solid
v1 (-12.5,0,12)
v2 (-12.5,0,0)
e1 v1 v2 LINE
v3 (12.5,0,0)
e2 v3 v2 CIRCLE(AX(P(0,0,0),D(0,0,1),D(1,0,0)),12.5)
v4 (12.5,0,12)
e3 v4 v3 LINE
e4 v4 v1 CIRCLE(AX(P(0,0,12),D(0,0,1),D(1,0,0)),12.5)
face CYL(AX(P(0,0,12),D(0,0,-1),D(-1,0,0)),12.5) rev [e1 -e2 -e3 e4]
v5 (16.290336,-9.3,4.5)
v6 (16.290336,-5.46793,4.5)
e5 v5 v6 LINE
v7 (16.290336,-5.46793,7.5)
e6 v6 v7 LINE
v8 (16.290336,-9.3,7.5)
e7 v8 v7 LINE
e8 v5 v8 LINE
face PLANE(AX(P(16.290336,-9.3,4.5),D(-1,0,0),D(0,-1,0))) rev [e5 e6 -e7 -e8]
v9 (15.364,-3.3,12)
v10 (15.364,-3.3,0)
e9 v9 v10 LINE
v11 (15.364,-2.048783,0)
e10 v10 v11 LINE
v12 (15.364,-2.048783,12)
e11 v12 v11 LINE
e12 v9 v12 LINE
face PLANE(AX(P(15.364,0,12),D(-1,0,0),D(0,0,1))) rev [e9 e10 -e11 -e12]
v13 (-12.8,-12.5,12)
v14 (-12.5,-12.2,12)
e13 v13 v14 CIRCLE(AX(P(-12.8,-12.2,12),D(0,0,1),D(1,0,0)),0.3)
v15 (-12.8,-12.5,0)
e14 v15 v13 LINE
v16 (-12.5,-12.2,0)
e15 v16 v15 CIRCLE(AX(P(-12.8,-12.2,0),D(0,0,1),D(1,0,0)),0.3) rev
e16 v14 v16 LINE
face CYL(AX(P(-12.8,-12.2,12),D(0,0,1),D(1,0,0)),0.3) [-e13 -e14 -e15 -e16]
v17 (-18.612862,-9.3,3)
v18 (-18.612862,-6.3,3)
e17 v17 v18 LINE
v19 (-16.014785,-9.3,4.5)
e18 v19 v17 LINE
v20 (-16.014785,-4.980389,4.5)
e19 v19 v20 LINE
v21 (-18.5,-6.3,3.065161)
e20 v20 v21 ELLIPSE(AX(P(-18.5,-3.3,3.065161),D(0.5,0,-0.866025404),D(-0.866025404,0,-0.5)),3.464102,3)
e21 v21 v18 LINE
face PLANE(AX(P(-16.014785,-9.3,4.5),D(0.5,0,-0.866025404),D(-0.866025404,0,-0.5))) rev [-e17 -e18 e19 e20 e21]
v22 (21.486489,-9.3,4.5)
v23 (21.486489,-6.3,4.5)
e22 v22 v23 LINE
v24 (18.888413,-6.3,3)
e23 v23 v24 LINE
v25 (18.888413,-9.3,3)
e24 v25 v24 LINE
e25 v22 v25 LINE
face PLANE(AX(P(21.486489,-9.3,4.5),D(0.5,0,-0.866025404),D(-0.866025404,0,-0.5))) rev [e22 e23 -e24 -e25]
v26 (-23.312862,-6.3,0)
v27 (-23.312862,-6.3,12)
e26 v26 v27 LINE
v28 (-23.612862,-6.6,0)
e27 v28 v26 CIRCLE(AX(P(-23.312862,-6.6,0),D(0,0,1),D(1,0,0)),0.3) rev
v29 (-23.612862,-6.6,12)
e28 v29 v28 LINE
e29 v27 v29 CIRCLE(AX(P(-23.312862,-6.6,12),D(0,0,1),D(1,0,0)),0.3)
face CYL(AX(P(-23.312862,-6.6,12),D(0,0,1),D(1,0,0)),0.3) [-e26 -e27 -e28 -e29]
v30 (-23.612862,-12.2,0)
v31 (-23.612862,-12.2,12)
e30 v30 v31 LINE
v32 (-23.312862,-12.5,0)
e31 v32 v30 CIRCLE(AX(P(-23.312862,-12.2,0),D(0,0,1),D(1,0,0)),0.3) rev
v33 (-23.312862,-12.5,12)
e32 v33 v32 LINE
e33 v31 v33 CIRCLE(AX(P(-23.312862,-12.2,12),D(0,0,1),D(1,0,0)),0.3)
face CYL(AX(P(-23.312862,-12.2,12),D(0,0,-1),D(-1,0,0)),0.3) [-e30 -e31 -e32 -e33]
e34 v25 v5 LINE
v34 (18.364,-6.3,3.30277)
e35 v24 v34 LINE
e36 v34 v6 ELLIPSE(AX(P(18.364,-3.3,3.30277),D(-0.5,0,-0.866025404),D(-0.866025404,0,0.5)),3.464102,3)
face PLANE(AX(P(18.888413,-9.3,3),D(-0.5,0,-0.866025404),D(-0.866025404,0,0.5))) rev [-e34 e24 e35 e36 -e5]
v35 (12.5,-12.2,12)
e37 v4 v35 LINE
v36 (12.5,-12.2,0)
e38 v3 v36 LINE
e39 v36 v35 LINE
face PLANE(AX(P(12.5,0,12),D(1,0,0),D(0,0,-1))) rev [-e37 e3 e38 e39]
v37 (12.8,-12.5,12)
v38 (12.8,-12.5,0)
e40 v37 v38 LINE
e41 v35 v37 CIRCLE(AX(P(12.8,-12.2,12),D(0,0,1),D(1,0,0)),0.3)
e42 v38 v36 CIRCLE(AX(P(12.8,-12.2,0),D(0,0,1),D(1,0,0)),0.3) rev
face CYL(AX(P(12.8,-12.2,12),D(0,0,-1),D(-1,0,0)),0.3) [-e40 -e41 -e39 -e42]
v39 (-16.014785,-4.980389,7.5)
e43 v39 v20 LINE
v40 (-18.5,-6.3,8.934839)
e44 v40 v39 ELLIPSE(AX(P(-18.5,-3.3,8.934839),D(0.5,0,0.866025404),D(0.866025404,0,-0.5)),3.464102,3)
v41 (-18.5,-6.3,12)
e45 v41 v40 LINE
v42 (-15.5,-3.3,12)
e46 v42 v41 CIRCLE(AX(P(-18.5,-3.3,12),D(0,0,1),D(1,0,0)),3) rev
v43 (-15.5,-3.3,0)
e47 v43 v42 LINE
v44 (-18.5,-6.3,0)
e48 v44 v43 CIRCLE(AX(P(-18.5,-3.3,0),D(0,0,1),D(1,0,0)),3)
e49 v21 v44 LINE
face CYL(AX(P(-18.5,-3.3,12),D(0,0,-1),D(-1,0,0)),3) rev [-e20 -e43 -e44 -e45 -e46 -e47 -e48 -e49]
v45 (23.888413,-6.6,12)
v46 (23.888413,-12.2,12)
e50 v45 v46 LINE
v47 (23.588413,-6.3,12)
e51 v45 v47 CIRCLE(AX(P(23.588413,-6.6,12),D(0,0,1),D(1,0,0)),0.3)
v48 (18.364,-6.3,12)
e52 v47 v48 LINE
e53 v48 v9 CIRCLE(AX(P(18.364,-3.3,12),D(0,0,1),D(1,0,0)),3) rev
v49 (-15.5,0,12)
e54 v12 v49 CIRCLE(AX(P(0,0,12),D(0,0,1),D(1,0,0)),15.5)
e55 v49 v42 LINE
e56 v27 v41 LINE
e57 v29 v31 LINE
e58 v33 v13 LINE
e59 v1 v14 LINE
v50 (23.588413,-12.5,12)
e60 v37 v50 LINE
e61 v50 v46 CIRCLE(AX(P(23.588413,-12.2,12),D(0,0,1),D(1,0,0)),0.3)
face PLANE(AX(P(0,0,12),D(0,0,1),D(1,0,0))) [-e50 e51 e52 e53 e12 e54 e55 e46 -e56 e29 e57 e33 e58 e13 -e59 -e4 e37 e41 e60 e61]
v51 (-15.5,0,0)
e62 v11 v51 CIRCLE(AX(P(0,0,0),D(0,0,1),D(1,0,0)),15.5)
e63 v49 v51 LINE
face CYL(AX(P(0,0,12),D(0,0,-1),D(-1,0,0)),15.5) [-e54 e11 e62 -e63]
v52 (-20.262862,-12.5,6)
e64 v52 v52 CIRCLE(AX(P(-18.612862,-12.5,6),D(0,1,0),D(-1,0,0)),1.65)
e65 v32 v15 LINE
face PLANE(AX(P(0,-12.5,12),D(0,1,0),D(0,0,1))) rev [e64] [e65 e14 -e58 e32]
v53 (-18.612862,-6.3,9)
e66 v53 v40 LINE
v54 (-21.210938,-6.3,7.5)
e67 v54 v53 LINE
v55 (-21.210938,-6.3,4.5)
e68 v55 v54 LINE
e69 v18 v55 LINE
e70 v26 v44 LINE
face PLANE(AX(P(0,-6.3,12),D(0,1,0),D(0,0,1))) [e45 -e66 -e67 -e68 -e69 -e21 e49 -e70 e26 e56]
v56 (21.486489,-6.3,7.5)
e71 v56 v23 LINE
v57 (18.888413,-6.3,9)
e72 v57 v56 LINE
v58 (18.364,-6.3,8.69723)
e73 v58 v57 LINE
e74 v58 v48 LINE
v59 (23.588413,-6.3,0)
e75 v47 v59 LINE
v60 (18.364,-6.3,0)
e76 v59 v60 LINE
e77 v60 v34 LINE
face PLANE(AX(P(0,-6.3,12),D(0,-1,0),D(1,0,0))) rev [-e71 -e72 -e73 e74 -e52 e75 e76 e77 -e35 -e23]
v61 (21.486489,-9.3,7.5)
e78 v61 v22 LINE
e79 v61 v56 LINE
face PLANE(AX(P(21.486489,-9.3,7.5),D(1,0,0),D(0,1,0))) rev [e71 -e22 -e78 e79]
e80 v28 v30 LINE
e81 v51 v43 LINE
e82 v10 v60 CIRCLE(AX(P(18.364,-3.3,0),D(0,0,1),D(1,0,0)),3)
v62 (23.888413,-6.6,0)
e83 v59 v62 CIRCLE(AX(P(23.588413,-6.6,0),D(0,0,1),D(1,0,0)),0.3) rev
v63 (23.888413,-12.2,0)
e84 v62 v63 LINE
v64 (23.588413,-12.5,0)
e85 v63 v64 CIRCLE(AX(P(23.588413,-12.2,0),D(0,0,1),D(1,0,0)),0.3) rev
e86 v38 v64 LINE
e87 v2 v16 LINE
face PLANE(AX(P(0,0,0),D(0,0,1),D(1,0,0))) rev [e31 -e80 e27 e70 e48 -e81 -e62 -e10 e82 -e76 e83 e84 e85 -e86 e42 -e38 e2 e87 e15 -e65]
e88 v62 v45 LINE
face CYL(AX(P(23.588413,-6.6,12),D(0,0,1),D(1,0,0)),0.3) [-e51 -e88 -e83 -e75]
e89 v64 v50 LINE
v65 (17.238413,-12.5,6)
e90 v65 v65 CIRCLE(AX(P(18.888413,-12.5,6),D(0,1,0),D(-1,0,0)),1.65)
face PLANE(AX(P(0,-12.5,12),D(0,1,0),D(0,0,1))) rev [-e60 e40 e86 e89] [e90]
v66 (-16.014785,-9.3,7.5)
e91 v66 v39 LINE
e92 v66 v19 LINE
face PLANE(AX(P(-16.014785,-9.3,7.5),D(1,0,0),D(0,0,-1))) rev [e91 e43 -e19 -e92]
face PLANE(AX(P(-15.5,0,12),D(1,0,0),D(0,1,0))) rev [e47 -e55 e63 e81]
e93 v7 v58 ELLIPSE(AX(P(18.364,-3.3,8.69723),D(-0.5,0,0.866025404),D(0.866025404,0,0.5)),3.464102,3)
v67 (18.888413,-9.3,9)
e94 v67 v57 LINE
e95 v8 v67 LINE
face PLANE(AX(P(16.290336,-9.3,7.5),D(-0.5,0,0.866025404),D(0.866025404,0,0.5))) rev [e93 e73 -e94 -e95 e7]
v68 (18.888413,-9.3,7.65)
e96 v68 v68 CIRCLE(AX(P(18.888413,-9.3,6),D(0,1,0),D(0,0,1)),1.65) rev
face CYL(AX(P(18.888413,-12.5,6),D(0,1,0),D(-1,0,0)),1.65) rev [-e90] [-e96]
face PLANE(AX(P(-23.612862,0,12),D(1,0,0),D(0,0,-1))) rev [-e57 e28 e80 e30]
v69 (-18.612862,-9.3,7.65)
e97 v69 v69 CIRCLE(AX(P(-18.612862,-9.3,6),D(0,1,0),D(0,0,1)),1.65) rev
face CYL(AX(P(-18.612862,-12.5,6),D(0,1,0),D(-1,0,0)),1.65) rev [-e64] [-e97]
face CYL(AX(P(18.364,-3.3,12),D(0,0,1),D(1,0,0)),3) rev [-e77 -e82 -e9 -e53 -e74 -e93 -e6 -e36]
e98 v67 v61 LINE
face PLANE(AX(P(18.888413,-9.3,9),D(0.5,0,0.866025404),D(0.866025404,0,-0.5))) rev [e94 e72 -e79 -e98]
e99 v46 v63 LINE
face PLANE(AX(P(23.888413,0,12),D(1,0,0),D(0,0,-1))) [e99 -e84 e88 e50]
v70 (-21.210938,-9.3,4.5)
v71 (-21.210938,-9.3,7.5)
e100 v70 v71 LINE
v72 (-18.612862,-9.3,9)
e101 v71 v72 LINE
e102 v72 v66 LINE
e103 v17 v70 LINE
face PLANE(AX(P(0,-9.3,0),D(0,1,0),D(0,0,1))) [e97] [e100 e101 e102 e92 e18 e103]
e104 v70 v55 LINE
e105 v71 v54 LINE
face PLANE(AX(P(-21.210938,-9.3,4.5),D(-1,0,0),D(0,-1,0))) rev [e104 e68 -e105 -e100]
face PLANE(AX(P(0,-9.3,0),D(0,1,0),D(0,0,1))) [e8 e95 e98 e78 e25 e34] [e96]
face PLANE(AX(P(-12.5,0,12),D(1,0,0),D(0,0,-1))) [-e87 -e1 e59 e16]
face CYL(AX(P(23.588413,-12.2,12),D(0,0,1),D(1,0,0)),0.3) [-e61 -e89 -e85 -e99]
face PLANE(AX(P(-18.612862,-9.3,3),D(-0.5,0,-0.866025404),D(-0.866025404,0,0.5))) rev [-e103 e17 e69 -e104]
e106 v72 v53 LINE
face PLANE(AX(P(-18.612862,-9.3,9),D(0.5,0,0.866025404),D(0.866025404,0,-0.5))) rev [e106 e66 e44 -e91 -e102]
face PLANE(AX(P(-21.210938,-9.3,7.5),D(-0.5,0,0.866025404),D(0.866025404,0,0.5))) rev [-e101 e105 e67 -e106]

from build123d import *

# Parameters (mm, degrees)
BOSS_EXTRUDE1_DEPTH = 12
SKETCH2_R           = 1.65
CUT_EXTRUDE1_DEPTH  = 35.49487292
CUT_EXTRUDE2_DEPTH  = 3
FILLET2_R           = 3
FILLET3_R           = 0.3


with BuildPart() as part:
    # Sketch1 → Boss-Extrude1 (new body)
    with BuildSketch(Plane.XY):
        with BuildLine():
            Line((-12.5, -12.5), (-12.5, 0))
            ThreePointArc((-12.5, 0), (0, 12.5), (12.5, 0))
            Line((12.5, 0), (12.5, -12.5))
            Line((12.5, -12.5), (23.888412626, -12.5))
            Line((23.888412626, -12.5), (23.888412626, -6.3))
            Line((23.888412626, -6.3), (15.363999686, -6.3))
            Line((15.363999686, -6.3), (15.363999686, -2.048783456))
            ThreePointArc((15.363999686, -2.048783456), (1.026646207, 15.465962549), (-15.5, 0))
            Line((-15.5, 0), (-15.5, -6.3))
            Line((-15.5, -6.3), (-23.612861565, -6.3))
            Line((-23.612861565, -6.3), (-23.612861565, -12.5))
            Line((-23.612861565, -12.5), (-12.5, -12.5))
        make_face()
    extrude(amount=BOSS_EXTRUDE1_DEPTH)

    # Sketch2 → Cut-Extrude1 (cut, through all)
    with BuildSketch(Plane(origin=(0, -6.3, 0), x_dir=(1, 0, 0), z_dir=(0, 1, 0))):
        with Locations(Location((-18.612861565, -6, 0), (0, 0, 180))):
            Circle(SKETCH2_R)
        with Locations(Location((18.888412626, -6, 0), (0, 0, 180))):
            Circle(SKETCH2_R)
    extrude(amount=-CUT_EXTRUDE1_DEPTH, mode=Mode.SUBTRACT)

    # Sketch3 → Cut-Extrude2 (cut)
    with BuildSketch(Plane(origin=(0, -6.3, 0), x_dir=(1, 0, 0), z_dir=(0, 1, 0))):
        Polygon((18.888412626, -3), (16.290336415, -4.5), (16.290336415, -7.5), (18.888412626, -9), (21.486488837, -7.5), (21.486488837, -4.5), align=None)
        Polygon((-18.612861565, -9), (-16.014785354, -7.5), (-16.014785354, -4.5), (-18.612861565, -3), (-21.210937777, -4.5), (-21.210937777, -7.5), align=None)
    extrude(amount=-CUT_EXTRUDE2_DEPTH, mode=Mode.SUBTRACT)

    # Fillet2
    # the kernel refuses this fillet: 3 mm, written as the material it adds along each edge
    with BuildSketch(Plane(origin=(-15.5, -6.3, 0), x_dir=(0, 1, 0), z_dir=(0, 0, 1))) as fillet2_piece_1_section:
        with BuildLine():
            CenterArc((FILLET2_R, FILLET2_R), FILLET2_R, 180, 90)
            Line((0, FILLET2_R), (0, 0))
            Line((0, 0), (FILLET2_R, 0))
        make_face()
    fillet2_piece_1 = extrude(amount=12, mode=Mode.PRIVATE)
    fillet2_piece_1 = split(fillet2_piece_1, bisect_by=Plane(origin=(-16.699597169, -5.271939642, 4.104623714), z_dir=(0.5000000000000008, 0, -0.8660254037844383)), keep=Keep.TOP, mode=Mode.PRIVATE)
    fillet2_piece_1 = split(fillet2_piece_1, bisect_by=Plane(origin=(-16.014785354, -5.271939642, 2.345499265), z_dir=(1, 0, 0)), keep=Keep.TOP, mode=Mode.PRIVATE)
    add(fillet2_piece_1)
    with BuildSketch(Plane(origin=(-15.5, -6.3, 0), x_dir=(0, 1, 0), z_dir=(0, 0, 1))) as fillet2_piece_2_section:
        with BuildLine():
            CenterArc((FILLET2_R, FILLET2_R), FILLET2_R, 180, 90)
            Line((0, FILLET2_R), (0, 0))
            Line((0, 0), (FILLET2_R, 0))
        make_face()
    fillet2_piece_2 = extrude(amount=12, mode=Mode.PRIVATE)
    fillet2_piece_2 = split(fillet2_piece_2, bisect_by=Plane(origin=(-17.543441621, -5.964994309, 3.617429893), z_dir=(0.5000000000000008, 0, -0.8660254037844383)), keep=Keep.TOP, mode=Mode.PRIVATE)
    fillet2_piece_2 = split(fillet2_piece_2, bisect_by=Plane(origin=(-16.014785354, -5.964994309, 2.067102796), z_dir=(-1, 0, 0)), keep=Keep.TOP, mode=Mode.PRIVATE)
    add(fillet2_piece_2)
    with BuildSketch(Plane(origin=(-15.5, -6.3, 0), x_dir=(0, 1, 0), z_dir=(0, 0, 1))) as fillet2_piece_3_section:
        with BuildLine():
            CenterArc((FILLET2_R, FILLET2_R), FILLET2_R, 180, 90)
            Line((0, FILLET2_R), (0, 0))
            Line((0, 0), (FILLET2_R, 0))
        make_face()
    fillet2_piece_3 = extrude(amount=12, mode=Mode.PRIVATE)
    fillet2_piece_3 = split(fillet2_piece_3, bisect_by=Plane(origin=(-15.128726527, -5.296162819, 5.011566302), z_dir=(-0.5000000000000008, 0, 0.8660254037844383)), keep=Keep.TOP, mode=Mode.PRIVATE)
    fillet2_piece_3 = split(fillet2_piece_3, bisect_by=Plane(origin=(-16.014785354, -5.296162819, 6), z_dir=(1, 0, 0)), keep=Keep.TOP, mode=Mode.PRIVATE)
    fillet2_piece_3 = split(fillet2_piece_3, bisect_by=Plane(origin=(-15.128726527, -5.296162819, 6.988433698), z_dir=(-0.49999999999999994, 0, -0.8660254037844389)), keep=Keep.TOP, mode=Mode.PRIVATE)
    add(fillet2_piece_3)
    with BuildSketch(Plane(origin=(-15.5, -6.3, 0), x_dir=(0, 1, 0), z_dir=(0, 0, 1))) as fillet2_piece_4_section:
        with BuildLine():
            CenterArc((FILLET2_R, FILLET2_R), FILLET2_R, 180, 90)
            Line((0, FILLET2_R), (0, 0))
            Line((0, 0), (FILLET2_R, 0))
        make_face()
    fillet2_piece_4 = extrude(amount=12, mode=Mode.PRIVATE)
    fillet2_piece_4 = split(fillet2_piece_4, bisect_by=Plane(origin=(-16.014785354, -5.271939642, 9.654500735), z_dir=(1, 0, 0)), keep=Keep.TOP, mode=Mode.PRIVATE)
    fillet2_piece_4 = split(fillet2_piece_4, bisect_by=Plane(origin=(-16.699597169, -5.271939642, 7.895376286), z_dir=(0.49999999999999994, 0, 0.8660254037844389)), keep=Keep.TOP, mode=Mode.PRIVATE)
    add(fillet2_piece_4)
    with BuildSketch(Plane(origin=(-15.5, -6.3, 0), x_dir=(0, 1, 0), z_dir=(0, 0, 1))) as fillet2_piece_5_section:
        with BuildLine():
            CenterArc((FILLET2_R, FILLET2_R), FILLET2_R, 180, 90)
            Line((0, FILLET2_R), (0, 0))
            Line((0, 0), (FILLET2_R, 0))
        make_face()
    fillet2_piece_5 = extrude(amount=12, mode=Mode.PRIVATE)
    fillet2_piece_5 = split(fillet2_piece_5, bisect_by=Plane(origin=(-16.014785354, -5.964994309, 9.932897204), z_dir=(-1, 0, 0)), keep=Keep.TOP, mode=Mode.PRIVATE)
    fillet2_piece_5 = split(fillet2_piece_5, bisect_by=Plane(origin=(-17.543441621, -5.964994309, 8.382570107), z_dir=(0.49999999999999994, 0, 0.8660254037844389)), keep=Keep.TOP, mode=Mode.PRIVATE)
    add(fillet2_piece_5)
    with BuildSketch(Plane(origin=(15.363999686, -6.3, 0), x_dir=(0, 1, 0), z_dir=(0, 0, 1))) as fillet2_piece_6_section:
        with BuildLine():
            CenterArc((FILLET2_R, -FILLET2_R), FILLET2_R, 90, 90)
            Line((0, -FILLET2_R), (0, 0))
            Line((0, 0), (FILLET2_R, 0))
        make_face()
    fillet2_piece_6 = extrude(amount=12, mode=Mode.PRIVATE)
    fillet2_piece_6 = split(fillet2_piece_6, bisect_by=Plane(origin=(16.290336415, -5.412045629, 2.423810939), z_dir=(-1, 0, 0)), keep=Keep.TOP, mode=Mode.PRIVATE)
    fillet2_piece_6 = split(fillet2_piece_6, bisect_by=Plane(origin=(16.737778584, -5.412045629, 4.241669143), z_dir=(-0.4999999999999997, 0, -0.866025403784439)), keep=Keep.TOP, mode=Mode.PRIVATE)
    add(fillet2_piece_6)
    with BuildSketch(Plane(origin=(15.363999686, -6.3, 0), x_dir=(0, 1, 0), z_dir=(0, 0, 1))) as fillet2_piece_7_section:
        with BuildLine():
            CenterArc((FILLET2_R, -FILLET2_R), FILLET2_R, 90, 90)
            Line((0, -FILLET2_R), (0, 0))
            Line((0, 0), (FILLET2_R, 0))
        make_face()
    fillet2_piece_7 = extrude(amount=12, mode=Mode.PRIVATE)
    fillet2_piece_7 = split(fillet2_piece_7, bisect_by=Plane(origin=(16.290336415, -6.100859955, 2.085482464), z_dir=(1, 0, 0)), keep=Keep.TOP, mode=Mode.PRIVATE)
    fillet2_piece_7 = split(fillet2_piece_7, bisect_by=Plane(origin=(17.763282274, -6.100859955, 3.649594312), z_dir=(-0.4999999999999997, 0, -0.866025403784439)), keep=Keep.TOP, mode=Mode.PRIVATE)
    add(fillet2_piece_7)
    with BuildSketch(Plane(origin=(15.363999686, -6.3, 0), x_dir=(0, 1, 0), z_dir=(0, 0, 1))) as fillet2_piece_8_section:
        with BuildLine():
            CenterArc((FILLET2_R, -FILLET2_R), FILLET2_R, 90, 90)
            Line((0, -FILLET2_R), (0, 0))
            Line((0, 0), (FILLET2_R, 0))
        make_face()
    fillet2_piece_8 = extrude(amount=12, mode=Mode.PRIVATE)
    fillet2_piece_8 = split(fillet2_piece_8, bisect_by=Plane(origin=(15.225397876, -5.465952717, 6.885157448), z_dir=(0.5000000000000012, 0, -0.866025403784438)), keep=Keep.TOP, mode=Mode.PRIVATE)
    fillet2_piece_8 = split(fillet2_piece_8, bisect_by=Plane(origin=(16.290336415, -5.465952717, 6), z_dir=(-1, 0, 0)), keep=Keep.TOP, mode=Mode.PRIVATE)
    fillet2_piece_8 = split(fillet2_piece_8, bisect_by=Plane(origin=(15.225397876, -5.465952717, 5.114842552), z_dir=(0.4999999999999997, 0, 0.866025403784439)), keep=Keep.TOP, mode=Mode.PRIVATE)
    add(fillet2_piece_8)
    with BuildSketch(Plane(origin=(15.363999686, -6.3, 0), x_dir=(0, 1, 0), z_dir=(0, 0, 1))) as fillet2_piece_9_section:
        with BuildLine():
            CenterArc((FILLET2_R, -FILLET2_R), FILLET2_R, 90, 90)
            Line((0, -FILLET2_R), (0, 0))
            Line((0, 0), (FILLET2_R, 0))
        make_face()
    fillet2_piece_9 = extrude(amount=12, mode=Mode.PRIVATE)
    fillet2_piece_9 = split(fillet2_piece_9, bisect_by=Plane(origin=(16.737778584, -5.412045629, 7.758330857), z_dir=(-0.5000000000000012, 0, 0.866025403784438)), keep=Keep.TOP, mode=Mode.PRIVATE)
    fillet2_piece_9 = split(fillet2_piece_9, bisect_by=Plane(origin=(16.290336415, -5.412045629, 9.576189061), z_dir=(-1, 0, 0)), keep=Keep.TOP, mode=Mode.PRIVATE)
    add(fillet2_piece_9)
    with BuildSketch(Plane(origin=(15.363999686, -6.3, 0), x_dir=(0, 1, 0), z_dir=(0, 0, 1))) as fillet2_piece_10_section:
        with BuildLine():
            CenterArc((FILLET2_R, -FILLET2_R), FILLET2_R, 90, 90)
            Line((0, -FILLET2_R), (0, 0))
            Line((0, 0), (FILLET2_R, 0))
        make_face()
    fillet2_piece_10 = extrude(amount=12, mode=Mode.PRIVATE)
    fillet2_piece_10 = split(fillet2_piece_10, bisect_by=Plane(origin=(17.763282274, -6.100859955, 8.350405688), z_dir=(-0.5000000000000012, 0, 0.866025403784438)), keep=Keep.TOP, mode=Mode.PRIVATE)
    fillet2_piece_10 = split(fillet2_piece_10, bisect_by=Plane(origin=(16.290336415, -6.100859955, 9.914517536), z_dir=(1, 0, 0)), keep=Keep.TOP, mode=Mode.PRIVATE)
    add(fillet2_piece_10)

    # Fillet3
    fillet3_edges = [part.edges().sort_by_distance(p)[0] for p in [
        (23.888412626, -6.3, 6),
        (23.888412626, -12.5, 6),
        (12.5, -12.5, 6),
        (-12.5, -12.5, 6),
        (-23.612861565, -12.5, 6),
        (-23.612861565, -6.3, 6),
    ]]
    fillet(fillet3_edges, radius=FILLET3_R)


solid = part.part
